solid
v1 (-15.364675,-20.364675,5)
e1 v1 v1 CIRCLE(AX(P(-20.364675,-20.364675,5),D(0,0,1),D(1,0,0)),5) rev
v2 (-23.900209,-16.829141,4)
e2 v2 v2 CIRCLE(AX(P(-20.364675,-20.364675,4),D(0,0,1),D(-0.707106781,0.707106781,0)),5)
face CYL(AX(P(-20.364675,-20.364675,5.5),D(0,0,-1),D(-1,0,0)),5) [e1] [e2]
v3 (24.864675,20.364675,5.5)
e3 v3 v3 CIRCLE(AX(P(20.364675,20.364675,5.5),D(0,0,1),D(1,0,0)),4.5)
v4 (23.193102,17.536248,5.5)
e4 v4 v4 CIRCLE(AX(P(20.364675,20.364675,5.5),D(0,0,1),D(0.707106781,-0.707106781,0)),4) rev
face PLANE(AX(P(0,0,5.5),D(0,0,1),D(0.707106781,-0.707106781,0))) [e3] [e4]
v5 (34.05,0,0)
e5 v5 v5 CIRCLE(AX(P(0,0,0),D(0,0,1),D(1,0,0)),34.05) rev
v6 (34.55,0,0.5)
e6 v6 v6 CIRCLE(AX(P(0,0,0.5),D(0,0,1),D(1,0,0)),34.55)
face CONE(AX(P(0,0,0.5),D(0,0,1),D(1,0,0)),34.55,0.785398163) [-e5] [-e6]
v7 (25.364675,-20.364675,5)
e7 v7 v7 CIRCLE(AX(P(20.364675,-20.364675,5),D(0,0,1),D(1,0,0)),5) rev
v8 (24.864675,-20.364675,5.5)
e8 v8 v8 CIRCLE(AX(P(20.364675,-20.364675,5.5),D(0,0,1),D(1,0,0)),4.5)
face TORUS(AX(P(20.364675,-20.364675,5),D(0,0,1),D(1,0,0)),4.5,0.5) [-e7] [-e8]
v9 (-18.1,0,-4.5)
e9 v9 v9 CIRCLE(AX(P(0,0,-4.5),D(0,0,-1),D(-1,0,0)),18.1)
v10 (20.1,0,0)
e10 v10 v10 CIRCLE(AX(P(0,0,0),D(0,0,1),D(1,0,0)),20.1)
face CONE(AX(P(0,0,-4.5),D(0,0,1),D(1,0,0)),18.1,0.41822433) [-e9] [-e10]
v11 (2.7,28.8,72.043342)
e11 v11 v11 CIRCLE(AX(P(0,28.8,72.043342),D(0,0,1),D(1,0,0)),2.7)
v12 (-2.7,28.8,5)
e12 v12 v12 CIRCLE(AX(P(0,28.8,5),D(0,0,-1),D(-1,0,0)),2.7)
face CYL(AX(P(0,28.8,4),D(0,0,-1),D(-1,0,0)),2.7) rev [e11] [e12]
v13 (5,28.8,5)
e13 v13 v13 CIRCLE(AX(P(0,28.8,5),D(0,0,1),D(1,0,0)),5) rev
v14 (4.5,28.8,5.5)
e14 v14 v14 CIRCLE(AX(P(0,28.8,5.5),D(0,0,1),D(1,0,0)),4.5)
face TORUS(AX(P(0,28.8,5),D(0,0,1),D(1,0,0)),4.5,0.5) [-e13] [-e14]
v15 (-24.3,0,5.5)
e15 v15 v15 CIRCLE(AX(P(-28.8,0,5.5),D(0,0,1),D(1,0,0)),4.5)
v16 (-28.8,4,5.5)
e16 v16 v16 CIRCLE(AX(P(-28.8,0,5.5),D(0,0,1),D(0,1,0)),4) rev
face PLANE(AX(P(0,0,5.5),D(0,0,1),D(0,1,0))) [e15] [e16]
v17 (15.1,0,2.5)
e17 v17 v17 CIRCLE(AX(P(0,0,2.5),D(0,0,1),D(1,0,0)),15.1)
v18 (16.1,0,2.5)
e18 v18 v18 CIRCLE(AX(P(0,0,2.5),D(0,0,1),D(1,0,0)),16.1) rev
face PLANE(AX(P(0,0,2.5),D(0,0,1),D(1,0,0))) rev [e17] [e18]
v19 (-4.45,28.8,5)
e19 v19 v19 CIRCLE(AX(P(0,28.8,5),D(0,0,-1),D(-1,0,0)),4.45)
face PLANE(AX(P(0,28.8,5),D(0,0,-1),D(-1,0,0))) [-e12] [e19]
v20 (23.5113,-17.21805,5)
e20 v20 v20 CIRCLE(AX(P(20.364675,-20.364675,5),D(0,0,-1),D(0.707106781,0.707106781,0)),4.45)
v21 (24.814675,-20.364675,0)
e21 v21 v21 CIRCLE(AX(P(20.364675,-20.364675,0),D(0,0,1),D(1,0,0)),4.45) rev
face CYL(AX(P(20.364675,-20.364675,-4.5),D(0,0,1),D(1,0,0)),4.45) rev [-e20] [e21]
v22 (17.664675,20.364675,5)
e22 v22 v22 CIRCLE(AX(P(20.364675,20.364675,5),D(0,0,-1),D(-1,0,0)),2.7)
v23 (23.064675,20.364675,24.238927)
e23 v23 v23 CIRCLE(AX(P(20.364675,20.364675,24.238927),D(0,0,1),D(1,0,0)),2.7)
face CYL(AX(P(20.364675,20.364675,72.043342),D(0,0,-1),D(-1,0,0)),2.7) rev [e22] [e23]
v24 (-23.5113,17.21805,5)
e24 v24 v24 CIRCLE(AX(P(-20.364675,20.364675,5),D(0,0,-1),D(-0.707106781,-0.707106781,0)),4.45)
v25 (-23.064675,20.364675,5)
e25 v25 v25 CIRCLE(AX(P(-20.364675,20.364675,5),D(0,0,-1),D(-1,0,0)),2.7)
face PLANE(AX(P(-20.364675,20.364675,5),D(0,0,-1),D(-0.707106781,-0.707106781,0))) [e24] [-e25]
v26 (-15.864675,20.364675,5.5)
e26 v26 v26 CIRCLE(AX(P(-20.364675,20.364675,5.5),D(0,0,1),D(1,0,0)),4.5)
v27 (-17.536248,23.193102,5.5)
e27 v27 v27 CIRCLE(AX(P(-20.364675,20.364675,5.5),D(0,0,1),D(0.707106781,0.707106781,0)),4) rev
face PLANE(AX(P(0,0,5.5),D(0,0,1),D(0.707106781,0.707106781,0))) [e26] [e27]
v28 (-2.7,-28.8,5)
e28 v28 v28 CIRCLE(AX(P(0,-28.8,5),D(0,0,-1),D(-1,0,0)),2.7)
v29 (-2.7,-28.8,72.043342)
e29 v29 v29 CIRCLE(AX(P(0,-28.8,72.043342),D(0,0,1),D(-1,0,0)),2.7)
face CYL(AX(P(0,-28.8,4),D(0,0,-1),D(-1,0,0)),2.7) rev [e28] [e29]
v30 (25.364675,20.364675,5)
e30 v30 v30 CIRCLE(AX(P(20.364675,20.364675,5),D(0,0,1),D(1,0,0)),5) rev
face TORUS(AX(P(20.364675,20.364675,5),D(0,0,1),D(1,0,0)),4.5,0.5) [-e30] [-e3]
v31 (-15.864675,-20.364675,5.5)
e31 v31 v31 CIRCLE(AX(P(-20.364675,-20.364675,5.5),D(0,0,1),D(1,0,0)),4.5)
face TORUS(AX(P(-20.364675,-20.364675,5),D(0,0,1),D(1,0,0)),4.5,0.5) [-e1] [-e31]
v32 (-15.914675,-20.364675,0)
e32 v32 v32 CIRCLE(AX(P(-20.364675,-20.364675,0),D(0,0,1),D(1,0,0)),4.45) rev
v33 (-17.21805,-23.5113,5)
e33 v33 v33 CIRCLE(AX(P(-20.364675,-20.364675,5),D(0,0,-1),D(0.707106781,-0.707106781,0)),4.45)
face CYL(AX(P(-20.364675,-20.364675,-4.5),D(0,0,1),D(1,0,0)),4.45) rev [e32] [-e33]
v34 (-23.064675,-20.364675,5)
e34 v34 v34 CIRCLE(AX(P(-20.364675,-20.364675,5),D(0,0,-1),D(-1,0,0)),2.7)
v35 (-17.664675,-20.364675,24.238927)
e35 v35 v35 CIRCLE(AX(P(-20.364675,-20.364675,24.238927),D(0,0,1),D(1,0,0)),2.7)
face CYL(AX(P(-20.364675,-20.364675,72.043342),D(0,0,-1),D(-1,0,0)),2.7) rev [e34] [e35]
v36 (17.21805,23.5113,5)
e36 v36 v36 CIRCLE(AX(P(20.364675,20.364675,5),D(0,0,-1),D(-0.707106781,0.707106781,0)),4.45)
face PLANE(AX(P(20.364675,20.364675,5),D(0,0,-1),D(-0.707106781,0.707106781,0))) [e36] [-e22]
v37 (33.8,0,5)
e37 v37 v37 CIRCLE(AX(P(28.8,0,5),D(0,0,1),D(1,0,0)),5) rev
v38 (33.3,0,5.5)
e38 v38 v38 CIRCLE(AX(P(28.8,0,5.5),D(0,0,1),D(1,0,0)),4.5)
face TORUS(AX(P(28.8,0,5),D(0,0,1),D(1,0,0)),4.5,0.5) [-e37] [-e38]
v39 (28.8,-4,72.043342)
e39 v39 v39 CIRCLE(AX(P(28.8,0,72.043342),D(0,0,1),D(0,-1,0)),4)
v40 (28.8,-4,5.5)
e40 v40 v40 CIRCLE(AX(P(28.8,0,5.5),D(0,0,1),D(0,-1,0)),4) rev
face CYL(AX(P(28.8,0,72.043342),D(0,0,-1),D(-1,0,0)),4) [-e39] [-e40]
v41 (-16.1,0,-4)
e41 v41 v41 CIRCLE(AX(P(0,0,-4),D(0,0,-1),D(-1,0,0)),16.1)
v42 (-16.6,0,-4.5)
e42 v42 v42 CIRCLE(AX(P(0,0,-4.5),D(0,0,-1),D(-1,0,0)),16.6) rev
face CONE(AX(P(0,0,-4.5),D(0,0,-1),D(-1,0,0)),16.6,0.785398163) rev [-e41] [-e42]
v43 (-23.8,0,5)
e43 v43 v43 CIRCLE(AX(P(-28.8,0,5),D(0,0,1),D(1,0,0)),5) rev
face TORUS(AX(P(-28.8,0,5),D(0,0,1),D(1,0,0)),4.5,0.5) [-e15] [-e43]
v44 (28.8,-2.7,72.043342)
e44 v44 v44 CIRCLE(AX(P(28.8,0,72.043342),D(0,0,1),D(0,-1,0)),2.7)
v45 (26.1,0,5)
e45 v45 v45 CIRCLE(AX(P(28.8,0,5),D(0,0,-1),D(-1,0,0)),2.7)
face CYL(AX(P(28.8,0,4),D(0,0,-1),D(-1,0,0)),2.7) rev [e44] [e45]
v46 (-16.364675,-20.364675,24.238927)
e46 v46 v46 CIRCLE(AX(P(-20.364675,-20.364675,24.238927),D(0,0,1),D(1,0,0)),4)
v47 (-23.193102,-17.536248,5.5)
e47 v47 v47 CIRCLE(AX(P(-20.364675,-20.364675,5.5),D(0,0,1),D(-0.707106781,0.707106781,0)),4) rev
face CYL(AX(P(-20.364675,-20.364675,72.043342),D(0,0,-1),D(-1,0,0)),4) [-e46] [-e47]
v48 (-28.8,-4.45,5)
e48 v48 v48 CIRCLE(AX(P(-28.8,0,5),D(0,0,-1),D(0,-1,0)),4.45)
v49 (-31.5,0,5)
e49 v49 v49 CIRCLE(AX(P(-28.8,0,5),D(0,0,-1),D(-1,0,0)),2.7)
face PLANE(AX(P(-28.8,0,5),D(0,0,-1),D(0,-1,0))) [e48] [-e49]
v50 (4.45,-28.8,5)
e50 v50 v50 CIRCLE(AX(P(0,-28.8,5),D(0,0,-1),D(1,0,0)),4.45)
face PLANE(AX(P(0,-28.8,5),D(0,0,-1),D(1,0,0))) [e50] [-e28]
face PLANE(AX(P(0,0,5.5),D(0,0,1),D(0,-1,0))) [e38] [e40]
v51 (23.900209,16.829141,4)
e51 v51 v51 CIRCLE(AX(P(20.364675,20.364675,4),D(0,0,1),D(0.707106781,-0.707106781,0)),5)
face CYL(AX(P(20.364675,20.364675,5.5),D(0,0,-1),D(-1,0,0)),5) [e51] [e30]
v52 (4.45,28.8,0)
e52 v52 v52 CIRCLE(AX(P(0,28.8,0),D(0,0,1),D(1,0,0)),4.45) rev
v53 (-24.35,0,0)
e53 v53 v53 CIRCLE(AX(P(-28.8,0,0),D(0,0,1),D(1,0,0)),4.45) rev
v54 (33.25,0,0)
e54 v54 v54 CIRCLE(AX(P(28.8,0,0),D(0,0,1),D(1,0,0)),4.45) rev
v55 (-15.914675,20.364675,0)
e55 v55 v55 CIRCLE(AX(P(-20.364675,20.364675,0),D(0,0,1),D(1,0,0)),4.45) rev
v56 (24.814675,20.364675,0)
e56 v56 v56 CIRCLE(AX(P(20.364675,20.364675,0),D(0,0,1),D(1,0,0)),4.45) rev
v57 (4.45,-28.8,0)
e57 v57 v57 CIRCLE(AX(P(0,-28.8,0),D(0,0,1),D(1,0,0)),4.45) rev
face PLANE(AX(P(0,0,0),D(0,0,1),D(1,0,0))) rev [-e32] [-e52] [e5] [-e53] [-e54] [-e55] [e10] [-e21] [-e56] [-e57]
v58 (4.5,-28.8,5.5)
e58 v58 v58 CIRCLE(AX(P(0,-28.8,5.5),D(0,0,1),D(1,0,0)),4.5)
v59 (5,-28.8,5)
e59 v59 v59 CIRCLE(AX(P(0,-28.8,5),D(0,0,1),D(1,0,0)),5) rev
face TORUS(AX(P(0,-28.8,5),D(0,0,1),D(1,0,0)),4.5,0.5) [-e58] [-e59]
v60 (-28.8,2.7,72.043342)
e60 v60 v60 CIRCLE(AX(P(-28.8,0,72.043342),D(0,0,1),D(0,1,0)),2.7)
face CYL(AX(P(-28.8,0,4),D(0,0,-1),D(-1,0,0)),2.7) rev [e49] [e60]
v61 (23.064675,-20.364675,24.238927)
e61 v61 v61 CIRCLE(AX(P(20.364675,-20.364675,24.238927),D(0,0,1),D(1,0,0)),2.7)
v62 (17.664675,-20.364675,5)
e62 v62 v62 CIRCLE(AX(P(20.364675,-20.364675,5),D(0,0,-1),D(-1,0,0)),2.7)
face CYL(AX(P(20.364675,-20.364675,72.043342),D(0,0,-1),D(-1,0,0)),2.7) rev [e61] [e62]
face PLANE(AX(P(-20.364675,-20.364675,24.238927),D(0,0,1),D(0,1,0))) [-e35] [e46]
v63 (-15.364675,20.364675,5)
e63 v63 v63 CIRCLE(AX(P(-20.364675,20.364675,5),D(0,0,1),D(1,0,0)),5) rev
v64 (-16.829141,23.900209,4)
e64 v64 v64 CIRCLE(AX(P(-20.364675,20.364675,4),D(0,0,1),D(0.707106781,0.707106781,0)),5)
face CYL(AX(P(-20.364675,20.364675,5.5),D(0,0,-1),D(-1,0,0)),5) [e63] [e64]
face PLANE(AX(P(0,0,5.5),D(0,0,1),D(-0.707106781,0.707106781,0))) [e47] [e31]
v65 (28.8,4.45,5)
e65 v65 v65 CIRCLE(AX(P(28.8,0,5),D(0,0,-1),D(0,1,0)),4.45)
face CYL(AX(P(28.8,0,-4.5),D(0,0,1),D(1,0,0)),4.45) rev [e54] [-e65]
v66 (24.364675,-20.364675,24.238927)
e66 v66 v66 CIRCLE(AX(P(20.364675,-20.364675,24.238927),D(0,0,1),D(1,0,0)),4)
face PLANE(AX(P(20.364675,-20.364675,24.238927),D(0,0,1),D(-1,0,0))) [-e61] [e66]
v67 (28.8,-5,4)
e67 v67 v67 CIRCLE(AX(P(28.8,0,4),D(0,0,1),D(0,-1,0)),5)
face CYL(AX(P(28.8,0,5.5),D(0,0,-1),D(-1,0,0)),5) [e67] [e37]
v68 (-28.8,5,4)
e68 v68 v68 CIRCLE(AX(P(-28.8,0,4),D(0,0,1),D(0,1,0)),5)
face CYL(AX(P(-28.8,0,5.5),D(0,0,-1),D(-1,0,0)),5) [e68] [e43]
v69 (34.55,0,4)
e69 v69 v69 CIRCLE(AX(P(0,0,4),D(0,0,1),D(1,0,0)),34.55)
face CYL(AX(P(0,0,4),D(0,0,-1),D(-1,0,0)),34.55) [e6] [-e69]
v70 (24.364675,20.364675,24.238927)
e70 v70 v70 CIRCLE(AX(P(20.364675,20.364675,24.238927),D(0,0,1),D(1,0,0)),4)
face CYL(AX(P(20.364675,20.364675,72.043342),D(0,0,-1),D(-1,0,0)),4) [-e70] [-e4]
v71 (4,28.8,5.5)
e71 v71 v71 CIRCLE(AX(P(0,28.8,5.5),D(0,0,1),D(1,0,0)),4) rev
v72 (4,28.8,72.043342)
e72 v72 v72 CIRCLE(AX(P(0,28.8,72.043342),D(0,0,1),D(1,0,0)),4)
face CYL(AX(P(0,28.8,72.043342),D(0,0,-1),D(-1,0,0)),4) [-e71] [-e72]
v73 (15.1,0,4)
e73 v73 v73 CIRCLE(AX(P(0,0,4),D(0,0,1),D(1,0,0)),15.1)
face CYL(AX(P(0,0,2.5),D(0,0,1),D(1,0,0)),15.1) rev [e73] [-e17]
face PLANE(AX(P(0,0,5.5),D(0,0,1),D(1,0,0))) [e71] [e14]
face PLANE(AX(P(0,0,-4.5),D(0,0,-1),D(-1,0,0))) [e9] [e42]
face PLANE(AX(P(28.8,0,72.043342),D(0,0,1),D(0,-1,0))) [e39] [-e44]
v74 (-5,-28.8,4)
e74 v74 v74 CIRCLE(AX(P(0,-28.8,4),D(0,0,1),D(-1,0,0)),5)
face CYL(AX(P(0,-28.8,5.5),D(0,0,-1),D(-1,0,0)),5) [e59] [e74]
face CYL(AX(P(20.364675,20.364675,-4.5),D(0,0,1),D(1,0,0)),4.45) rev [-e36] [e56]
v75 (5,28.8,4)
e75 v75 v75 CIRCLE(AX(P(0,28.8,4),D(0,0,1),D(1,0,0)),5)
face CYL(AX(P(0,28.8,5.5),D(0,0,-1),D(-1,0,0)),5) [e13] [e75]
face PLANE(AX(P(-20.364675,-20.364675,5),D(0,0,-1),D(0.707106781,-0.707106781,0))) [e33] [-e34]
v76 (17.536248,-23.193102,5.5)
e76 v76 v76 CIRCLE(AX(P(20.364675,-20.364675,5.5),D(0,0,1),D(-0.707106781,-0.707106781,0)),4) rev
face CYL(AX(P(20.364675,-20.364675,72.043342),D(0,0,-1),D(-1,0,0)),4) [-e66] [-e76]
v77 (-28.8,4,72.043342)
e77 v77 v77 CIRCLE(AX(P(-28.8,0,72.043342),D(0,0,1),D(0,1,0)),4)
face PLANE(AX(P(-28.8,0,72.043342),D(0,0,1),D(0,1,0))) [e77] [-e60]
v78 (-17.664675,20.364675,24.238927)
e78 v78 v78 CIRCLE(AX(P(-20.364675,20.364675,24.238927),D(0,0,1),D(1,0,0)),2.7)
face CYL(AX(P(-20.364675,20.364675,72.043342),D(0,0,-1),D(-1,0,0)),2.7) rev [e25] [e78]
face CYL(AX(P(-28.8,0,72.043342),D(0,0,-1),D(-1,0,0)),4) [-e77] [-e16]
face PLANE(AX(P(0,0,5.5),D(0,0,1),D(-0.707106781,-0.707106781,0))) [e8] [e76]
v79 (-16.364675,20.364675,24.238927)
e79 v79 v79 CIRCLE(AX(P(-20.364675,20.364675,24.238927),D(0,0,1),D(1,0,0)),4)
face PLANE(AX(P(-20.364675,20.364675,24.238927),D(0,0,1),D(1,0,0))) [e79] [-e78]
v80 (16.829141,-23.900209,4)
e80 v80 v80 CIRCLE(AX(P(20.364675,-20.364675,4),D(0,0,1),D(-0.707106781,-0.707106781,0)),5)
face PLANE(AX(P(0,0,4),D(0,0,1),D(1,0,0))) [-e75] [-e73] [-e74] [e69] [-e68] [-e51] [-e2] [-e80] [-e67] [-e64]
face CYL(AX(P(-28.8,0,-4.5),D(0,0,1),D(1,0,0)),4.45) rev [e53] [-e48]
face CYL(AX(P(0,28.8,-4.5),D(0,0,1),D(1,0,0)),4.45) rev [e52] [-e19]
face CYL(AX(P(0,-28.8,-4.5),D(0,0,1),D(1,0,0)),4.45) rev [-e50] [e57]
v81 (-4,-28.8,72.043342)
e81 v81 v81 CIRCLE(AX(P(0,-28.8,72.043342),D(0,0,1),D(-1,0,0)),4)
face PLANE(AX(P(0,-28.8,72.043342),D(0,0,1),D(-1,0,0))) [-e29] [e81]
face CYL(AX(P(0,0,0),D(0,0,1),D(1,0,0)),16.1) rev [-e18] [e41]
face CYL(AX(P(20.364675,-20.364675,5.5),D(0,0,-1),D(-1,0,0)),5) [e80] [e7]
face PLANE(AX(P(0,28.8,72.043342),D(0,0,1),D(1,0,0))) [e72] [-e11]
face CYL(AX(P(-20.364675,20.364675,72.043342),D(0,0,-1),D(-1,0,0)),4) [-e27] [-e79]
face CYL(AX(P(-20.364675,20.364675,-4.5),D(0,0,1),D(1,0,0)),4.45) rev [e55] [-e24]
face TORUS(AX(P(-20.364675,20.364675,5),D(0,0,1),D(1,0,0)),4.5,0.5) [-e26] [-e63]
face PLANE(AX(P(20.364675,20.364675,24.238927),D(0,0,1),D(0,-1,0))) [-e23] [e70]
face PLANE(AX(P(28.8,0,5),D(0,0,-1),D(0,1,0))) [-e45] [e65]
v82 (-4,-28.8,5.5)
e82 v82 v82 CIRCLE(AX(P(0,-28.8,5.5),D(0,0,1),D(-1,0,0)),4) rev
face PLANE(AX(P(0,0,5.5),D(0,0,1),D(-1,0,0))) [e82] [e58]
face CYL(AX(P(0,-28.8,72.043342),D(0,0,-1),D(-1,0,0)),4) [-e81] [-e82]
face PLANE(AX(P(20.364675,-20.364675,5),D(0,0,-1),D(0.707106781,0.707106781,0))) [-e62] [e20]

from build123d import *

# Parameters (mm, degrees)
SKETCH1_R                = 34.55
SKETCH1_R_2              = 2.7
BOSS_EXTRUDE1_DEPTH      = 4
SKETCH2_R                = 4
SKETCH2_R_2              = 2.7
BOSS_EXTRUDE2_DEPTH      = 68.04334183
SKETCH3_R                = 5
SKETCH3_R_2              = 4
BOSS_EXTRUDE3_DEPTH      = 1.5
FILLET2_R                = 0.5
CIRPATTERN1_COUNT        = 8
FILLET2_OF_CIRPATTERN1_R = 0.5
CHAMFER1_SIZE            = 0.5
SKETCH9_R                = 8
CUT_EXTRUDE4_DEPTH       = 84.76933429
BOSS_EXTRUDE7_START      = -6.5
SKETCH10_R               = 8
SKETCH10_R_2             = 6.5
BOSS_EXTRUDE7_DEPTH      = 6.5
CUT_EXTRUDE5_DEPTH       = 84.76933429
CUT_EXTRUDE5_DEPTH_BACK  = 84.76933429
SKETCH14_R               = 16.1
SKETCH15_R               = 16.1
SKETCH15_R_2             = 15.1
BOSS_EXTRUDE8_DEPTH      = 1.5
SKETCH16_R               = 18.1
SKETCH16_R_2             = 16.1
BOSS_EXTRUDE9_DEPTH      = 4.5
CHAMFER3_SIZE2           = 4.5
CHAMFER3_SIZE            = 2
CUT_EXTRUDE3_START       = -5
SKETCH7_R                = 4.45
CUT_EXTRUDE3_DEPTH       = 93.049687547
CIRPATTERN2_COUNT        = 8
CHAMFER4_SIZE            = 0.5
SKETCH17_R               = 6.596186261
CUT_EXTRUDE6_DEPTH       = 47.80441483
CIRPATTERN3_COUNT        = 4


with BuildPart() as part:
    # Sketch1 → Boss-Extrude1 (new body)
    with BuildSketch(Plane.XY):
        Circle(SKETCH1_R)
        with Locations((0, 28.8)):
            Circle(SKETCH1_R_2, mode=Mode.SUBTRACT)
        with Locations((28.8, 0)):
            Circle(SKETCH1_R_2, mode=Mode.SUBTRACT)
        with Locations((0, -28.8)):
            Circle(SKETCH1_R_2, mode=Mode.SUBTRACT)
        with Locations((-28.8, 0)):
            Circle(SKETCH1_R_2, mode=Mode.SUBTRACT)
    extrude(amount=BOSS_EXTRUDE1_DEPTH)

    # Sketch2 → Boss-Extrude2 (add)
    with BuildSketch(Plane.XY.offset(4)):
        with Locations((0, 28.8)):
            Circle(SKETCH2_R)
        with Locations((0, 28.8)):
            Circle(SKETCH2_R_2, mode=Mode.SUBTRACT)
    boss_extrude2 = extrude(amount=BOSS_EXTRUDE2_DEPTH)

    # Sketch3 → Boss-Extrude3 (add)
    with BuildSketch(Plane.XY.offset(4)):
        with Locations((0, 28.8)):
            Circle(SKETCH3_R)
        with Locations((0, 28.8)):
            Circle(SKETCH3_R_2, mode=Mode.SUBTRACT)
    boss_extrude3 = extrude(amount=BOSS_EXTRUDE3_DEPTH)

    # Fillet2
    fillet2_edges = [part.edges().sort_by_distance(p)[0] for p in [
        (-5, 28.8, 5.5),
    ]]
    fillet(fillet2_edges, radius=FILLET2_R)

    # CirPattern1: Boss-Extrude2, Boss-Extrude3 ×8 about axis
    cirpattern1_axis = Axis((0, 0, 0), (0, 0, 1))
    add([boss_extrude2.rotate(cirpattern1_axis, i * 360 / CIRPATTERN1_COUNT) for i in range(1, CIRPATTERN1_COUNT)])
    add([boss_extrude3.rotate(cirpattern1_axis, i * 360 / CIRPATTERN1_COUNT) for i in range(1, CIRPATTERN1_COUNT)])

    # Fillet2 of CirPattern1
    fillet2_of_cirpattern1_edges = [part.edges().sort_by_distance(p)[0] for p in [
        (-23.900209204, 16.829141392, 5.5),
        (-28.8, -5, 5.5),
        (-16.829141392, -23.900209204, 5.5),
        (5, -28.8, 5.5),
        (23.900209204, -16.829141392, 5.5),
        (28.8, 5, 5.5),
        (16.829141392, 23.900209204, 5.5),
    ]]
    fillet(fillet2_of_cirpattern1_edges, radius=FILLET2_OF_CIRPATTERN1_R)

    # Chamfer1
    chamfer1_edges = [part.edges().sort_by_distance(p)[0] for p in [
        (-34.55, 0, 0),
    ]]
    chamfer(chamfer1_edges, length=CHAMFER1_SIZE)

    # Sketch9 → Cut-Extrude4 (cut, through all)
    with BuildSketch(Plane.XY.offset(4)):
        Circle(SKETCH9_R)
    extrude(amount=-CUT_EXTRUDE4_DEPTH, mode=Mode.SUBTRACT)

    # Sketch10 → Boss-Extrude7 (add)
    with BuildSketch(Plane(origin=(0, 0, 0), x_dir=(-1, 0, 0), z_dir=(0, 0, -1)).offset(BOSS_EXTRUDE7_START)):
        Circle(SKETCH10_R)
        Circle(SKETCH10_R_2, mode=Mode.SUBTRACT)
    extrude(amount=BOSS_EXTRUDE7_DEPTH)

    # Sketch14 → Cut-Extrude5 (cut, two sides: drawn at the far end of the back side and taken through both)
    with BuildSketch(Plane.XY.offset(4).offset(-CUT_EXTRUDE5_DEPTH_BACK)):
        Circle(SKETCH14_R)
    extrude(amount=CUT_EXTRUDE5_DEPTH + CUT_EXTRUDE5_DEPTH_BACK, mode=Mode.SUBTRACT)

    # Sketch15 → Boss-Extrude8 (add)
    with BuildSketch(Plane.XY.offset(4)):
        Circle(SKETCH15_R)
        Circle(SKETCH15_R_2, mode=Mode.SUBTRACT)
    extrude(amount=-BOSS_EXTRUDE8_DEPTH)

    # Sketch16 → Boss-Extrude9 (add)
    with BuildSketch(Plane(origin=(0, 0, 0), x_dir=(-1, 0, 0), z_dir=(0, 0, -1))):
        with Locations(Location((0, 0, 0), (0, 0, 180))):
            Circle(SKETCH16_R)
        with Locations(Location((0, 0, 0), (0, 0, 180))):
            Circle(SKETCH16_R_2, mode=Mode.SUBTRACT)
    extrude(amount=BOSS_EXTRUDE9_DEPTH)

    # Chamfer3
    chamfer3_edges = [part.edges().sort_by_distance(p)[0] for p in [
        (-18.1, 0, 0),
    ]]
    chamfer3_side = [part.faces().sort_by_distance(p)[0] for p in [
        (-18.14, 0, 0),
    ]]
    chamfer(chamfer3_edges, length=CHAMFER3_SIZE - 0.0001, length2=CHAMFER3_SIZE2 - 0.0001, reference=chamfer3_side[0])  # a hair under: the kernel refuses the full size

    # Sketch7 → Cut-Extrude3 (cut)
    with BuildSketch(Plane(origin=(0, 0, 0), x_dir=(-1, 0, 0), z_dir=(0, 0, -1)).offset(CUT_EXTRUDE3_START)):
        with Locations(Location((0, 28.8, 0), (0, 0, 180))):
            Circle(SKETCH7_R)
    cut_extrude3 = extrude(amount=CUT_EXTRUDE3_DEPTH, mode=Mode.SUBTRACT)

    # CirPattern2: Cut-Extrude3 ×8 about axis
    cirpattern2_axis = Axis((0, 0, 0), (0, 0, 1))
    for i in range(1, CIRPATTERN2_COUNT):
        add(cut_extrude3.rotate(cirpattern2_axis, i * 360 / CIRPATTERN2_COUNT), mode=Mode.SUBTRACT)

    # Chamfer4
    chamfer4_edges = [part.edges().sort_by_distance(p)[0] for p in [
        (-16.1, 0, -4.5),
    ]]
    chamfer(chamfer4_edges, length=CHAMFER4_SIZE)

    # Sketch17 → Cut-Extrude6 (cut)
    with BuildSketch(Plane.XY.offset(72.04334183)):
        with Locations((-20.364675298, 20.364675298)):
            Circle(SKETCH17_R)
    cut_extrude6 = extrude(amount=-CUT_EXTRUDE6_DEPTH, mode=Mode.SUBTRACT)

    # CirPattern3: Cut-Extrude6 ×4 about axis
    cirpattern3_axis = Axis((0, 0, 4), (0, 0, 1))
    for i in range(1, CIRPATTERN3_COUNT):
        add(cut_extrude6.rotate(cirpattern3_axis, i * 360 / CIRPATTERN3_COUNT), mode=Mode.SUBTRACT)


solid = part.part
